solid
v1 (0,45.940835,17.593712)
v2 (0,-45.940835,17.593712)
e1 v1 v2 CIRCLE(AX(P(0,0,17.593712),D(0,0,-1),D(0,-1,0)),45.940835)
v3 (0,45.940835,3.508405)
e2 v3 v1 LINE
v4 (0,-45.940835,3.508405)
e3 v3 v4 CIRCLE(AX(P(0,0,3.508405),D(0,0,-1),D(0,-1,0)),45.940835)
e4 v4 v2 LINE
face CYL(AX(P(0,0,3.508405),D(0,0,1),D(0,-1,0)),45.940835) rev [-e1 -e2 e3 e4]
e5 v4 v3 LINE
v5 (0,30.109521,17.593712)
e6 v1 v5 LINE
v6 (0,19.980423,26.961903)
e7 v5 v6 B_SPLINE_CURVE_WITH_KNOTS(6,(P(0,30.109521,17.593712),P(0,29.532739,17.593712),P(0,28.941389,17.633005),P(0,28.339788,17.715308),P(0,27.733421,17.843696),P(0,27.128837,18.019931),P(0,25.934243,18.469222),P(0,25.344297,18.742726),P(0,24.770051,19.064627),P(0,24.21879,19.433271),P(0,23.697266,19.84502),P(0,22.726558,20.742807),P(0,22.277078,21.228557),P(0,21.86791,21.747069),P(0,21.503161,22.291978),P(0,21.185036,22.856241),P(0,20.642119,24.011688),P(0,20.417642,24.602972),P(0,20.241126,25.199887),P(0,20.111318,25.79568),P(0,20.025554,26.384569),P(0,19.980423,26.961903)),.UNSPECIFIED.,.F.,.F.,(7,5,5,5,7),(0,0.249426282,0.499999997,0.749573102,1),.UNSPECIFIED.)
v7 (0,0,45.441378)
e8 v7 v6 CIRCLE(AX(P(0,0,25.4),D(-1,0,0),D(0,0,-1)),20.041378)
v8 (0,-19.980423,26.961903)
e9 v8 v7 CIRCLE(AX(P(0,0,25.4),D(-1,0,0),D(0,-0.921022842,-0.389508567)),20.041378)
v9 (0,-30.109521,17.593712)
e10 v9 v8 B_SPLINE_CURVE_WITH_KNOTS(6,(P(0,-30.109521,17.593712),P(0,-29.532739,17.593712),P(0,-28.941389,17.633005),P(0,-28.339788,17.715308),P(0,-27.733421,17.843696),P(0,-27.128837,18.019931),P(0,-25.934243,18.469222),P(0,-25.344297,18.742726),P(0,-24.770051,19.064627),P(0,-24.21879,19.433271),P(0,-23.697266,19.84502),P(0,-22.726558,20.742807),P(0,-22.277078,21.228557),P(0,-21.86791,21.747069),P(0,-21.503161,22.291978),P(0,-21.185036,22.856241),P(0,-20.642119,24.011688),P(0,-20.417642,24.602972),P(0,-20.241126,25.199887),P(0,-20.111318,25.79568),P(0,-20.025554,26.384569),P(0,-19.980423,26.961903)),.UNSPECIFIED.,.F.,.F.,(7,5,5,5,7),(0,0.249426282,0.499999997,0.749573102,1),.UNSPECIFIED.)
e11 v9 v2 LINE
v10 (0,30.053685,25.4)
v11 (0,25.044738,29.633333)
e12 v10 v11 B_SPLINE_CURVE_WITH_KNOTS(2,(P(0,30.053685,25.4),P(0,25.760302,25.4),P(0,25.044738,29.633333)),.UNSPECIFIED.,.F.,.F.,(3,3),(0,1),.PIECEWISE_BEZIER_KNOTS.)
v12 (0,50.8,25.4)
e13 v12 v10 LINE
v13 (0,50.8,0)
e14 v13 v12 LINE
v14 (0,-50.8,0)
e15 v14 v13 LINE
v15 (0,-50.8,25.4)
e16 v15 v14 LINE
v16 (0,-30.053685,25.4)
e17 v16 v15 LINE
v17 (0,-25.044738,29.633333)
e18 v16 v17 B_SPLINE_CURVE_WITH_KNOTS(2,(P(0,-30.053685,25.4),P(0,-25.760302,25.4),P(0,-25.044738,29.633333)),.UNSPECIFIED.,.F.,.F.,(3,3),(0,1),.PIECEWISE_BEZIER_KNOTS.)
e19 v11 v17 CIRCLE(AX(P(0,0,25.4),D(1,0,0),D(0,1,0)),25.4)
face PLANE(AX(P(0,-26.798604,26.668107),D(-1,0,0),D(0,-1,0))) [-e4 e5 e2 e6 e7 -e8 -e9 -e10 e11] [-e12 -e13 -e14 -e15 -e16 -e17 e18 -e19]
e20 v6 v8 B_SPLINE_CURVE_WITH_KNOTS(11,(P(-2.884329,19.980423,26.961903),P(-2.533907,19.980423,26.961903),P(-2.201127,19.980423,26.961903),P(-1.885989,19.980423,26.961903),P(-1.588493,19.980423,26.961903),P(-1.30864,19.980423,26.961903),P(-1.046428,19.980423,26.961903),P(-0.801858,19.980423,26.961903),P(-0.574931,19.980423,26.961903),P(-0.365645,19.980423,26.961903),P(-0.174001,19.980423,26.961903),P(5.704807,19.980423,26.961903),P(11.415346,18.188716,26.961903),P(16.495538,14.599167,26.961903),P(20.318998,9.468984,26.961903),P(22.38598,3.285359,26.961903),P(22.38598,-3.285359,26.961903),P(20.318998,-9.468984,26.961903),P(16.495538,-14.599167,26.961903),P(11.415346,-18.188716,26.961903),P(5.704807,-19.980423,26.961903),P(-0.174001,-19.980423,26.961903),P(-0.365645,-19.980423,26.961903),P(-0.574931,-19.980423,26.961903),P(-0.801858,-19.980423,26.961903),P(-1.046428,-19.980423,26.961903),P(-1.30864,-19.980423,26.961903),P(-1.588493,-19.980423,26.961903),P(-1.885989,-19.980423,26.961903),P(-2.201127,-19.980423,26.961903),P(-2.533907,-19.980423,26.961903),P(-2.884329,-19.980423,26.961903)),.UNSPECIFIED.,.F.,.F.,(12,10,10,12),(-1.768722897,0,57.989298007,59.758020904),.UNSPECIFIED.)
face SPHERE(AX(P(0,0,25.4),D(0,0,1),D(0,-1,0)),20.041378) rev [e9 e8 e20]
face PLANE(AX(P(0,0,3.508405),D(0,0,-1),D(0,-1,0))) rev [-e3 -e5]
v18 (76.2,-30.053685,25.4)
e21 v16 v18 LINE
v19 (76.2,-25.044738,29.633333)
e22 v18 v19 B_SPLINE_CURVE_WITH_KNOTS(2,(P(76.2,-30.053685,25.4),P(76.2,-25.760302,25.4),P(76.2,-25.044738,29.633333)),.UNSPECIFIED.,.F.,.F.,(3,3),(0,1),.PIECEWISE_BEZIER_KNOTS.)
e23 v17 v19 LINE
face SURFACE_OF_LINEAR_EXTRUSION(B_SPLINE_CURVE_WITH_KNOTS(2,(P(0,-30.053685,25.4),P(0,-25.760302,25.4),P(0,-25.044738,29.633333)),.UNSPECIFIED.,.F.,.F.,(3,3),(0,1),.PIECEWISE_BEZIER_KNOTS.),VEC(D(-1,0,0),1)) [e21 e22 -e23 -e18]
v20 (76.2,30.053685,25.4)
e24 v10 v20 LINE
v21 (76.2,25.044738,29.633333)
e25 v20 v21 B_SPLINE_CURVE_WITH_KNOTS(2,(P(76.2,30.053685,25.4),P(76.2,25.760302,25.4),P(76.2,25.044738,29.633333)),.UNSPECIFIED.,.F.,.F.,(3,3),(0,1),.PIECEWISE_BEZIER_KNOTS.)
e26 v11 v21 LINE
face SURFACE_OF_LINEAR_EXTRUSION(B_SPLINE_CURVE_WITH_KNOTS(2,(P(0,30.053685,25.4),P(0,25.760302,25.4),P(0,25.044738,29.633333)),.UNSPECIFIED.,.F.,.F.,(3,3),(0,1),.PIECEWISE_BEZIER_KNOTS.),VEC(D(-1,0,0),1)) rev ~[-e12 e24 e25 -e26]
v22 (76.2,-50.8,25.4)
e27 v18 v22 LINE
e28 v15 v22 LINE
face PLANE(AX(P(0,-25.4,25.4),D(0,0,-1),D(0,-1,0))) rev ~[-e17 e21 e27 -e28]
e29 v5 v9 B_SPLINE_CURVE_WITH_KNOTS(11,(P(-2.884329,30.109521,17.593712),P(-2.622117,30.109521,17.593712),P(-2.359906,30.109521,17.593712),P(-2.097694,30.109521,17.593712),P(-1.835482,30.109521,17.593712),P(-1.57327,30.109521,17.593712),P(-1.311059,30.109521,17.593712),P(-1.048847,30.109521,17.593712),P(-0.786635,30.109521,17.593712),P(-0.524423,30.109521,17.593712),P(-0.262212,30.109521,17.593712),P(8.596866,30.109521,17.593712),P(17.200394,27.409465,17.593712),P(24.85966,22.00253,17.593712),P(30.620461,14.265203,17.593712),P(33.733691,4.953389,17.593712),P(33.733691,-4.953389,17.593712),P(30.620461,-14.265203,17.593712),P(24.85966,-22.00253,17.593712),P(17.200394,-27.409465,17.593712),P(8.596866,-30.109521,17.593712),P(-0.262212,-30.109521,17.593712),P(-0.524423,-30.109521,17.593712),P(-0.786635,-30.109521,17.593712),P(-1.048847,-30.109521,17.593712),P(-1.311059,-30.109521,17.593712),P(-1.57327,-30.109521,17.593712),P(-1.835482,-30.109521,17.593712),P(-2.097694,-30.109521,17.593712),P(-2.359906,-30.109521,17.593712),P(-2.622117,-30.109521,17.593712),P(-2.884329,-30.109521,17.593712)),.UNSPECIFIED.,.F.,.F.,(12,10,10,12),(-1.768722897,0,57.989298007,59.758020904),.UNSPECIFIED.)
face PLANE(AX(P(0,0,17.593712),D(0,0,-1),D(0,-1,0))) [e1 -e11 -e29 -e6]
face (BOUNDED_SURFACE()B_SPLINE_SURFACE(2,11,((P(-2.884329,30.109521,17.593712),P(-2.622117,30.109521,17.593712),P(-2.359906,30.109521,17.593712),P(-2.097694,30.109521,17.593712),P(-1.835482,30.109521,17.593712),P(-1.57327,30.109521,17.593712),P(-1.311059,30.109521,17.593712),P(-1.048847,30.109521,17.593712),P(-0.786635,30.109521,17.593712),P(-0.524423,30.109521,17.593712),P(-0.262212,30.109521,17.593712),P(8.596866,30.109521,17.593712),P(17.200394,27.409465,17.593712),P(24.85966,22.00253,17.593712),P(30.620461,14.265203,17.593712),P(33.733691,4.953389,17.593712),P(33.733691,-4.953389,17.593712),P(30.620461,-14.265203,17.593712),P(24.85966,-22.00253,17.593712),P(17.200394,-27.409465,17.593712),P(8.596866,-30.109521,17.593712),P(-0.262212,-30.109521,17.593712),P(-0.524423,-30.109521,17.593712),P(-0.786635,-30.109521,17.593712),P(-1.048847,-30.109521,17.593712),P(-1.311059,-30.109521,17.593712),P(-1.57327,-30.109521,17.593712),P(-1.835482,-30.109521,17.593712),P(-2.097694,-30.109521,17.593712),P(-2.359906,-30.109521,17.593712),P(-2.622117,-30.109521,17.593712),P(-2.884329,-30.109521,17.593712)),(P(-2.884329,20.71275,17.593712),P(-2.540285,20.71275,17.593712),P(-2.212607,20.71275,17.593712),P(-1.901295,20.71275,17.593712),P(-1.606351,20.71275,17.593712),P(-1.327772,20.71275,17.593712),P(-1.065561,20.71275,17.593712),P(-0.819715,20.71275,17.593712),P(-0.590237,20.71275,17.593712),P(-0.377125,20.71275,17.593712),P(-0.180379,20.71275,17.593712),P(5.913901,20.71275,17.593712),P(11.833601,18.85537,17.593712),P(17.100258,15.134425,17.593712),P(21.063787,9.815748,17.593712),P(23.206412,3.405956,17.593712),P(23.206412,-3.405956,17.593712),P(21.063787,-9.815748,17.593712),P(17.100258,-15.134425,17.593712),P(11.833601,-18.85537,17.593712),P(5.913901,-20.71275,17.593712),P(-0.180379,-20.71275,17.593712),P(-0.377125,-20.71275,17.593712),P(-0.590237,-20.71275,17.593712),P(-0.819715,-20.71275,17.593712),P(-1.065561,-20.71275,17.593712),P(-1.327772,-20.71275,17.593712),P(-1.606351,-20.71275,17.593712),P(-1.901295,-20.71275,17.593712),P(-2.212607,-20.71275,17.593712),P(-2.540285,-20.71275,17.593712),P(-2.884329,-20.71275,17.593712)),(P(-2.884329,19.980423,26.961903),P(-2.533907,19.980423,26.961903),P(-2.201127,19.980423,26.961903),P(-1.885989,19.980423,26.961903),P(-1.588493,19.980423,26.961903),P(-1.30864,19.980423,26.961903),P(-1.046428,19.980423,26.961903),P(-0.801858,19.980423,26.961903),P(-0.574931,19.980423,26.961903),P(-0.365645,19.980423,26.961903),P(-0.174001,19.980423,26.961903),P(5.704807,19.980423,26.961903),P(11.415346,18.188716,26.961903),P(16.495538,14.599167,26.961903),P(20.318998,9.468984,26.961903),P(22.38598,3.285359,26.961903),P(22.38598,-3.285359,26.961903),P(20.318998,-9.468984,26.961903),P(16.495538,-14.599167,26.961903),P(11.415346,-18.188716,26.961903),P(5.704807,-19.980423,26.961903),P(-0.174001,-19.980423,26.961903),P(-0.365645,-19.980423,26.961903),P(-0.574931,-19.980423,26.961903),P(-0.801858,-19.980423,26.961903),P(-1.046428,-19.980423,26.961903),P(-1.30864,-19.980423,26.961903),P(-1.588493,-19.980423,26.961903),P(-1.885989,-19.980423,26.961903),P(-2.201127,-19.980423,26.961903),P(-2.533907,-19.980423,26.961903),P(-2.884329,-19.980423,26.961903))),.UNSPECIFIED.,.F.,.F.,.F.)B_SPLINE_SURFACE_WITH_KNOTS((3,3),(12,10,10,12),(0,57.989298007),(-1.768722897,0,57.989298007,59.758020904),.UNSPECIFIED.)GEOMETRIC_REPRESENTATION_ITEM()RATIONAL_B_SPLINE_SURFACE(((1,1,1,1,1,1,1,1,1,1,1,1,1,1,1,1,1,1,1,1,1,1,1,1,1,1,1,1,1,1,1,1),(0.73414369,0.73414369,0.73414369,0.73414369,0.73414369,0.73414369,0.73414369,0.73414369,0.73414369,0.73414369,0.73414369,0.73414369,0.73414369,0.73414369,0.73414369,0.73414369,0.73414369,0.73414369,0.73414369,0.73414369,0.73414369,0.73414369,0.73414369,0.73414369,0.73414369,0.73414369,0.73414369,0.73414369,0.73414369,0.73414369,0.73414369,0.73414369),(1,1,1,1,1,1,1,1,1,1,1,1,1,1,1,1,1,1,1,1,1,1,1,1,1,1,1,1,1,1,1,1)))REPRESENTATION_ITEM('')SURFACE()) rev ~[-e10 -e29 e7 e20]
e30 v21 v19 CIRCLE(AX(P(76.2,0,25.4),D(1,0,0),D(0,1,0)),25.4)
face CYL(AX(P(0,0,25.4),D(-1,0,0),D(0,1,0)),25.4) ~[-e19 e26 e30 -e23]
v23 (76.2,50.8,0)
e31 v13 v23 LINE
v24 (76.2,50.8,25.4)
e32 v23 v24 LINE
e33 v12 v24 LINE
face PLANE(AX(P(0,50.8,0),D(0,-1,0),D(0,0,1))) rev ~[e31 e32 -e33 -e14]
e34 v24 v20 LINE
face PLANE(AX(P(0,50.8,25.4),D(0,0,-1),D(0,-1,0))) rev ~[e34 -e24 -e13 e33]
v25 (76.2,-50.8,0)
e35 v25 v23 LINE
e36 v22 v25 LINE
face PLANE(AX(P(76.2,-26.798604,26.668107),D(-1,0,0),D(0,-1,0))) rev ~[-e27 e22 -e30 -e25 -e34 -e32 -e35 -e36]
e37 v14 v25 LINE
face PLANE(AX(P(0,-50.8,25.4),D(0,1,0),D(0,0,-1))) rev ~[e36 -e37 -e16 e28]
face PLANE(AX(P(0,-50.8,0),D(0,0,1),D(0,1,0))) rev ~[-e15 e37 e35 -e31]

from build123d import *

# Parameters (mm, degrees)
F1_DEPTH    = 76.2
F2_T1_DEPTH = 76.2
F5_R        = 10.16


# Not quite as in the source:
# - a fillet or chamfer that OpenCascade refuses, or shapes differently, is made with other operations: its cross-section is extruded or revolved along the edge and cut away or added


with BuildPart() as f1:
    # F0 (on Right) → F1 (new body)
    with BuildSketch(Plane.YZ):
        with BuildLine():
            Line((-50.8, 0), (0, 0))
            Line((0, 0), (50.8, 0))
            Line((50.8, 0), (50.8, 25.4))
            Line((50.8, 25.4), (25.4, 25.4))
            ThreePointArc((25.4, 25.4), (0, 50.8), (-25.4, 25.4))
            Line((-25.4, 25.4), (-50.8, 25.4))
            Line((-50.8, 25.4), (-50.8, 0))
        make_face()
    extrude(amount=F1_DEPTH)

    # F2: fillet of radius 5.08 on 2 edges, made by hand

    # F2_s2 → F2_t1 (join)
    with BuildSketch(Plane.YZ):
        with BuildLine():
            add(Edge.make_bspline(
                [(-30.0536852981, 25.4), (-25.7603016841, 25.4), (-25.0447377485, 29.6333333333)],
                knots=[0, 0, 0, 1, 1, 1], degree=2, weights=[1, 1, 1]))
            ThreePointArc((-25.0447377485, 29.6333333333), (-25.3110286122, 27.5241070111), (-25.4, 25.4))
            Line((-25.4, 25.4), (-30.0536852981, 25.4))
        make_face()
        with BuildLine():
            add(Edge.make_bspline(
                [(30.0536852981, 25.4), (25.7603016841, 25.4), (25.0447377485, 29.6333333333)],
                knots=[0, 0, 0, 1, 1, 1], degree=2, weights=[1, 1, 1]))
            ThreePointArc((25.0447377485, 29.6333333333), (25.3110286122, 27.5241070111), (25.4, 25.4))
            Line((25.4, 25.4), (30.0536852981, 25.4))
        make_face()
    extrude(amount=F2_T1_DEPTH)

    # F3 (on face) → F4 (revolve, cut)
    with BuildSketch(Plane(origin=(0, 0, 0), x_dir=(0, -1, 0), z_dir=(-1, 0, 0))):
        with BuildLine():
            Line((0, 45.441377908), (0, 3.5084052943))
            Line((0, 3.5084052943), (45.9408350289, 3.5084052943))
            Line((45.9408350289, 3.5084052943), (45.9408350289, 17.5937116146))
            Line((45.9408350289, 17.5937116146), (18.4585668484, 17.5937116146))
            ThreePointArc((18.4585668484, 17.5937116146), (16.7048736009, 36.4726702484), (0, 45.441377908))
        make_face()
    revolve(axis=Axis((0, 0, 24.4748916011), (0, 0, -1)), mode=Mode.SUBTRACT)

    # F5
    f5_edges = [f1.edges().sort_by_distance(p)[0] for p in [
        (18.458567, 0, 17.593712),
    ]]
    fillet(f5_edges, radius=F5_R)


solid = f1.part
